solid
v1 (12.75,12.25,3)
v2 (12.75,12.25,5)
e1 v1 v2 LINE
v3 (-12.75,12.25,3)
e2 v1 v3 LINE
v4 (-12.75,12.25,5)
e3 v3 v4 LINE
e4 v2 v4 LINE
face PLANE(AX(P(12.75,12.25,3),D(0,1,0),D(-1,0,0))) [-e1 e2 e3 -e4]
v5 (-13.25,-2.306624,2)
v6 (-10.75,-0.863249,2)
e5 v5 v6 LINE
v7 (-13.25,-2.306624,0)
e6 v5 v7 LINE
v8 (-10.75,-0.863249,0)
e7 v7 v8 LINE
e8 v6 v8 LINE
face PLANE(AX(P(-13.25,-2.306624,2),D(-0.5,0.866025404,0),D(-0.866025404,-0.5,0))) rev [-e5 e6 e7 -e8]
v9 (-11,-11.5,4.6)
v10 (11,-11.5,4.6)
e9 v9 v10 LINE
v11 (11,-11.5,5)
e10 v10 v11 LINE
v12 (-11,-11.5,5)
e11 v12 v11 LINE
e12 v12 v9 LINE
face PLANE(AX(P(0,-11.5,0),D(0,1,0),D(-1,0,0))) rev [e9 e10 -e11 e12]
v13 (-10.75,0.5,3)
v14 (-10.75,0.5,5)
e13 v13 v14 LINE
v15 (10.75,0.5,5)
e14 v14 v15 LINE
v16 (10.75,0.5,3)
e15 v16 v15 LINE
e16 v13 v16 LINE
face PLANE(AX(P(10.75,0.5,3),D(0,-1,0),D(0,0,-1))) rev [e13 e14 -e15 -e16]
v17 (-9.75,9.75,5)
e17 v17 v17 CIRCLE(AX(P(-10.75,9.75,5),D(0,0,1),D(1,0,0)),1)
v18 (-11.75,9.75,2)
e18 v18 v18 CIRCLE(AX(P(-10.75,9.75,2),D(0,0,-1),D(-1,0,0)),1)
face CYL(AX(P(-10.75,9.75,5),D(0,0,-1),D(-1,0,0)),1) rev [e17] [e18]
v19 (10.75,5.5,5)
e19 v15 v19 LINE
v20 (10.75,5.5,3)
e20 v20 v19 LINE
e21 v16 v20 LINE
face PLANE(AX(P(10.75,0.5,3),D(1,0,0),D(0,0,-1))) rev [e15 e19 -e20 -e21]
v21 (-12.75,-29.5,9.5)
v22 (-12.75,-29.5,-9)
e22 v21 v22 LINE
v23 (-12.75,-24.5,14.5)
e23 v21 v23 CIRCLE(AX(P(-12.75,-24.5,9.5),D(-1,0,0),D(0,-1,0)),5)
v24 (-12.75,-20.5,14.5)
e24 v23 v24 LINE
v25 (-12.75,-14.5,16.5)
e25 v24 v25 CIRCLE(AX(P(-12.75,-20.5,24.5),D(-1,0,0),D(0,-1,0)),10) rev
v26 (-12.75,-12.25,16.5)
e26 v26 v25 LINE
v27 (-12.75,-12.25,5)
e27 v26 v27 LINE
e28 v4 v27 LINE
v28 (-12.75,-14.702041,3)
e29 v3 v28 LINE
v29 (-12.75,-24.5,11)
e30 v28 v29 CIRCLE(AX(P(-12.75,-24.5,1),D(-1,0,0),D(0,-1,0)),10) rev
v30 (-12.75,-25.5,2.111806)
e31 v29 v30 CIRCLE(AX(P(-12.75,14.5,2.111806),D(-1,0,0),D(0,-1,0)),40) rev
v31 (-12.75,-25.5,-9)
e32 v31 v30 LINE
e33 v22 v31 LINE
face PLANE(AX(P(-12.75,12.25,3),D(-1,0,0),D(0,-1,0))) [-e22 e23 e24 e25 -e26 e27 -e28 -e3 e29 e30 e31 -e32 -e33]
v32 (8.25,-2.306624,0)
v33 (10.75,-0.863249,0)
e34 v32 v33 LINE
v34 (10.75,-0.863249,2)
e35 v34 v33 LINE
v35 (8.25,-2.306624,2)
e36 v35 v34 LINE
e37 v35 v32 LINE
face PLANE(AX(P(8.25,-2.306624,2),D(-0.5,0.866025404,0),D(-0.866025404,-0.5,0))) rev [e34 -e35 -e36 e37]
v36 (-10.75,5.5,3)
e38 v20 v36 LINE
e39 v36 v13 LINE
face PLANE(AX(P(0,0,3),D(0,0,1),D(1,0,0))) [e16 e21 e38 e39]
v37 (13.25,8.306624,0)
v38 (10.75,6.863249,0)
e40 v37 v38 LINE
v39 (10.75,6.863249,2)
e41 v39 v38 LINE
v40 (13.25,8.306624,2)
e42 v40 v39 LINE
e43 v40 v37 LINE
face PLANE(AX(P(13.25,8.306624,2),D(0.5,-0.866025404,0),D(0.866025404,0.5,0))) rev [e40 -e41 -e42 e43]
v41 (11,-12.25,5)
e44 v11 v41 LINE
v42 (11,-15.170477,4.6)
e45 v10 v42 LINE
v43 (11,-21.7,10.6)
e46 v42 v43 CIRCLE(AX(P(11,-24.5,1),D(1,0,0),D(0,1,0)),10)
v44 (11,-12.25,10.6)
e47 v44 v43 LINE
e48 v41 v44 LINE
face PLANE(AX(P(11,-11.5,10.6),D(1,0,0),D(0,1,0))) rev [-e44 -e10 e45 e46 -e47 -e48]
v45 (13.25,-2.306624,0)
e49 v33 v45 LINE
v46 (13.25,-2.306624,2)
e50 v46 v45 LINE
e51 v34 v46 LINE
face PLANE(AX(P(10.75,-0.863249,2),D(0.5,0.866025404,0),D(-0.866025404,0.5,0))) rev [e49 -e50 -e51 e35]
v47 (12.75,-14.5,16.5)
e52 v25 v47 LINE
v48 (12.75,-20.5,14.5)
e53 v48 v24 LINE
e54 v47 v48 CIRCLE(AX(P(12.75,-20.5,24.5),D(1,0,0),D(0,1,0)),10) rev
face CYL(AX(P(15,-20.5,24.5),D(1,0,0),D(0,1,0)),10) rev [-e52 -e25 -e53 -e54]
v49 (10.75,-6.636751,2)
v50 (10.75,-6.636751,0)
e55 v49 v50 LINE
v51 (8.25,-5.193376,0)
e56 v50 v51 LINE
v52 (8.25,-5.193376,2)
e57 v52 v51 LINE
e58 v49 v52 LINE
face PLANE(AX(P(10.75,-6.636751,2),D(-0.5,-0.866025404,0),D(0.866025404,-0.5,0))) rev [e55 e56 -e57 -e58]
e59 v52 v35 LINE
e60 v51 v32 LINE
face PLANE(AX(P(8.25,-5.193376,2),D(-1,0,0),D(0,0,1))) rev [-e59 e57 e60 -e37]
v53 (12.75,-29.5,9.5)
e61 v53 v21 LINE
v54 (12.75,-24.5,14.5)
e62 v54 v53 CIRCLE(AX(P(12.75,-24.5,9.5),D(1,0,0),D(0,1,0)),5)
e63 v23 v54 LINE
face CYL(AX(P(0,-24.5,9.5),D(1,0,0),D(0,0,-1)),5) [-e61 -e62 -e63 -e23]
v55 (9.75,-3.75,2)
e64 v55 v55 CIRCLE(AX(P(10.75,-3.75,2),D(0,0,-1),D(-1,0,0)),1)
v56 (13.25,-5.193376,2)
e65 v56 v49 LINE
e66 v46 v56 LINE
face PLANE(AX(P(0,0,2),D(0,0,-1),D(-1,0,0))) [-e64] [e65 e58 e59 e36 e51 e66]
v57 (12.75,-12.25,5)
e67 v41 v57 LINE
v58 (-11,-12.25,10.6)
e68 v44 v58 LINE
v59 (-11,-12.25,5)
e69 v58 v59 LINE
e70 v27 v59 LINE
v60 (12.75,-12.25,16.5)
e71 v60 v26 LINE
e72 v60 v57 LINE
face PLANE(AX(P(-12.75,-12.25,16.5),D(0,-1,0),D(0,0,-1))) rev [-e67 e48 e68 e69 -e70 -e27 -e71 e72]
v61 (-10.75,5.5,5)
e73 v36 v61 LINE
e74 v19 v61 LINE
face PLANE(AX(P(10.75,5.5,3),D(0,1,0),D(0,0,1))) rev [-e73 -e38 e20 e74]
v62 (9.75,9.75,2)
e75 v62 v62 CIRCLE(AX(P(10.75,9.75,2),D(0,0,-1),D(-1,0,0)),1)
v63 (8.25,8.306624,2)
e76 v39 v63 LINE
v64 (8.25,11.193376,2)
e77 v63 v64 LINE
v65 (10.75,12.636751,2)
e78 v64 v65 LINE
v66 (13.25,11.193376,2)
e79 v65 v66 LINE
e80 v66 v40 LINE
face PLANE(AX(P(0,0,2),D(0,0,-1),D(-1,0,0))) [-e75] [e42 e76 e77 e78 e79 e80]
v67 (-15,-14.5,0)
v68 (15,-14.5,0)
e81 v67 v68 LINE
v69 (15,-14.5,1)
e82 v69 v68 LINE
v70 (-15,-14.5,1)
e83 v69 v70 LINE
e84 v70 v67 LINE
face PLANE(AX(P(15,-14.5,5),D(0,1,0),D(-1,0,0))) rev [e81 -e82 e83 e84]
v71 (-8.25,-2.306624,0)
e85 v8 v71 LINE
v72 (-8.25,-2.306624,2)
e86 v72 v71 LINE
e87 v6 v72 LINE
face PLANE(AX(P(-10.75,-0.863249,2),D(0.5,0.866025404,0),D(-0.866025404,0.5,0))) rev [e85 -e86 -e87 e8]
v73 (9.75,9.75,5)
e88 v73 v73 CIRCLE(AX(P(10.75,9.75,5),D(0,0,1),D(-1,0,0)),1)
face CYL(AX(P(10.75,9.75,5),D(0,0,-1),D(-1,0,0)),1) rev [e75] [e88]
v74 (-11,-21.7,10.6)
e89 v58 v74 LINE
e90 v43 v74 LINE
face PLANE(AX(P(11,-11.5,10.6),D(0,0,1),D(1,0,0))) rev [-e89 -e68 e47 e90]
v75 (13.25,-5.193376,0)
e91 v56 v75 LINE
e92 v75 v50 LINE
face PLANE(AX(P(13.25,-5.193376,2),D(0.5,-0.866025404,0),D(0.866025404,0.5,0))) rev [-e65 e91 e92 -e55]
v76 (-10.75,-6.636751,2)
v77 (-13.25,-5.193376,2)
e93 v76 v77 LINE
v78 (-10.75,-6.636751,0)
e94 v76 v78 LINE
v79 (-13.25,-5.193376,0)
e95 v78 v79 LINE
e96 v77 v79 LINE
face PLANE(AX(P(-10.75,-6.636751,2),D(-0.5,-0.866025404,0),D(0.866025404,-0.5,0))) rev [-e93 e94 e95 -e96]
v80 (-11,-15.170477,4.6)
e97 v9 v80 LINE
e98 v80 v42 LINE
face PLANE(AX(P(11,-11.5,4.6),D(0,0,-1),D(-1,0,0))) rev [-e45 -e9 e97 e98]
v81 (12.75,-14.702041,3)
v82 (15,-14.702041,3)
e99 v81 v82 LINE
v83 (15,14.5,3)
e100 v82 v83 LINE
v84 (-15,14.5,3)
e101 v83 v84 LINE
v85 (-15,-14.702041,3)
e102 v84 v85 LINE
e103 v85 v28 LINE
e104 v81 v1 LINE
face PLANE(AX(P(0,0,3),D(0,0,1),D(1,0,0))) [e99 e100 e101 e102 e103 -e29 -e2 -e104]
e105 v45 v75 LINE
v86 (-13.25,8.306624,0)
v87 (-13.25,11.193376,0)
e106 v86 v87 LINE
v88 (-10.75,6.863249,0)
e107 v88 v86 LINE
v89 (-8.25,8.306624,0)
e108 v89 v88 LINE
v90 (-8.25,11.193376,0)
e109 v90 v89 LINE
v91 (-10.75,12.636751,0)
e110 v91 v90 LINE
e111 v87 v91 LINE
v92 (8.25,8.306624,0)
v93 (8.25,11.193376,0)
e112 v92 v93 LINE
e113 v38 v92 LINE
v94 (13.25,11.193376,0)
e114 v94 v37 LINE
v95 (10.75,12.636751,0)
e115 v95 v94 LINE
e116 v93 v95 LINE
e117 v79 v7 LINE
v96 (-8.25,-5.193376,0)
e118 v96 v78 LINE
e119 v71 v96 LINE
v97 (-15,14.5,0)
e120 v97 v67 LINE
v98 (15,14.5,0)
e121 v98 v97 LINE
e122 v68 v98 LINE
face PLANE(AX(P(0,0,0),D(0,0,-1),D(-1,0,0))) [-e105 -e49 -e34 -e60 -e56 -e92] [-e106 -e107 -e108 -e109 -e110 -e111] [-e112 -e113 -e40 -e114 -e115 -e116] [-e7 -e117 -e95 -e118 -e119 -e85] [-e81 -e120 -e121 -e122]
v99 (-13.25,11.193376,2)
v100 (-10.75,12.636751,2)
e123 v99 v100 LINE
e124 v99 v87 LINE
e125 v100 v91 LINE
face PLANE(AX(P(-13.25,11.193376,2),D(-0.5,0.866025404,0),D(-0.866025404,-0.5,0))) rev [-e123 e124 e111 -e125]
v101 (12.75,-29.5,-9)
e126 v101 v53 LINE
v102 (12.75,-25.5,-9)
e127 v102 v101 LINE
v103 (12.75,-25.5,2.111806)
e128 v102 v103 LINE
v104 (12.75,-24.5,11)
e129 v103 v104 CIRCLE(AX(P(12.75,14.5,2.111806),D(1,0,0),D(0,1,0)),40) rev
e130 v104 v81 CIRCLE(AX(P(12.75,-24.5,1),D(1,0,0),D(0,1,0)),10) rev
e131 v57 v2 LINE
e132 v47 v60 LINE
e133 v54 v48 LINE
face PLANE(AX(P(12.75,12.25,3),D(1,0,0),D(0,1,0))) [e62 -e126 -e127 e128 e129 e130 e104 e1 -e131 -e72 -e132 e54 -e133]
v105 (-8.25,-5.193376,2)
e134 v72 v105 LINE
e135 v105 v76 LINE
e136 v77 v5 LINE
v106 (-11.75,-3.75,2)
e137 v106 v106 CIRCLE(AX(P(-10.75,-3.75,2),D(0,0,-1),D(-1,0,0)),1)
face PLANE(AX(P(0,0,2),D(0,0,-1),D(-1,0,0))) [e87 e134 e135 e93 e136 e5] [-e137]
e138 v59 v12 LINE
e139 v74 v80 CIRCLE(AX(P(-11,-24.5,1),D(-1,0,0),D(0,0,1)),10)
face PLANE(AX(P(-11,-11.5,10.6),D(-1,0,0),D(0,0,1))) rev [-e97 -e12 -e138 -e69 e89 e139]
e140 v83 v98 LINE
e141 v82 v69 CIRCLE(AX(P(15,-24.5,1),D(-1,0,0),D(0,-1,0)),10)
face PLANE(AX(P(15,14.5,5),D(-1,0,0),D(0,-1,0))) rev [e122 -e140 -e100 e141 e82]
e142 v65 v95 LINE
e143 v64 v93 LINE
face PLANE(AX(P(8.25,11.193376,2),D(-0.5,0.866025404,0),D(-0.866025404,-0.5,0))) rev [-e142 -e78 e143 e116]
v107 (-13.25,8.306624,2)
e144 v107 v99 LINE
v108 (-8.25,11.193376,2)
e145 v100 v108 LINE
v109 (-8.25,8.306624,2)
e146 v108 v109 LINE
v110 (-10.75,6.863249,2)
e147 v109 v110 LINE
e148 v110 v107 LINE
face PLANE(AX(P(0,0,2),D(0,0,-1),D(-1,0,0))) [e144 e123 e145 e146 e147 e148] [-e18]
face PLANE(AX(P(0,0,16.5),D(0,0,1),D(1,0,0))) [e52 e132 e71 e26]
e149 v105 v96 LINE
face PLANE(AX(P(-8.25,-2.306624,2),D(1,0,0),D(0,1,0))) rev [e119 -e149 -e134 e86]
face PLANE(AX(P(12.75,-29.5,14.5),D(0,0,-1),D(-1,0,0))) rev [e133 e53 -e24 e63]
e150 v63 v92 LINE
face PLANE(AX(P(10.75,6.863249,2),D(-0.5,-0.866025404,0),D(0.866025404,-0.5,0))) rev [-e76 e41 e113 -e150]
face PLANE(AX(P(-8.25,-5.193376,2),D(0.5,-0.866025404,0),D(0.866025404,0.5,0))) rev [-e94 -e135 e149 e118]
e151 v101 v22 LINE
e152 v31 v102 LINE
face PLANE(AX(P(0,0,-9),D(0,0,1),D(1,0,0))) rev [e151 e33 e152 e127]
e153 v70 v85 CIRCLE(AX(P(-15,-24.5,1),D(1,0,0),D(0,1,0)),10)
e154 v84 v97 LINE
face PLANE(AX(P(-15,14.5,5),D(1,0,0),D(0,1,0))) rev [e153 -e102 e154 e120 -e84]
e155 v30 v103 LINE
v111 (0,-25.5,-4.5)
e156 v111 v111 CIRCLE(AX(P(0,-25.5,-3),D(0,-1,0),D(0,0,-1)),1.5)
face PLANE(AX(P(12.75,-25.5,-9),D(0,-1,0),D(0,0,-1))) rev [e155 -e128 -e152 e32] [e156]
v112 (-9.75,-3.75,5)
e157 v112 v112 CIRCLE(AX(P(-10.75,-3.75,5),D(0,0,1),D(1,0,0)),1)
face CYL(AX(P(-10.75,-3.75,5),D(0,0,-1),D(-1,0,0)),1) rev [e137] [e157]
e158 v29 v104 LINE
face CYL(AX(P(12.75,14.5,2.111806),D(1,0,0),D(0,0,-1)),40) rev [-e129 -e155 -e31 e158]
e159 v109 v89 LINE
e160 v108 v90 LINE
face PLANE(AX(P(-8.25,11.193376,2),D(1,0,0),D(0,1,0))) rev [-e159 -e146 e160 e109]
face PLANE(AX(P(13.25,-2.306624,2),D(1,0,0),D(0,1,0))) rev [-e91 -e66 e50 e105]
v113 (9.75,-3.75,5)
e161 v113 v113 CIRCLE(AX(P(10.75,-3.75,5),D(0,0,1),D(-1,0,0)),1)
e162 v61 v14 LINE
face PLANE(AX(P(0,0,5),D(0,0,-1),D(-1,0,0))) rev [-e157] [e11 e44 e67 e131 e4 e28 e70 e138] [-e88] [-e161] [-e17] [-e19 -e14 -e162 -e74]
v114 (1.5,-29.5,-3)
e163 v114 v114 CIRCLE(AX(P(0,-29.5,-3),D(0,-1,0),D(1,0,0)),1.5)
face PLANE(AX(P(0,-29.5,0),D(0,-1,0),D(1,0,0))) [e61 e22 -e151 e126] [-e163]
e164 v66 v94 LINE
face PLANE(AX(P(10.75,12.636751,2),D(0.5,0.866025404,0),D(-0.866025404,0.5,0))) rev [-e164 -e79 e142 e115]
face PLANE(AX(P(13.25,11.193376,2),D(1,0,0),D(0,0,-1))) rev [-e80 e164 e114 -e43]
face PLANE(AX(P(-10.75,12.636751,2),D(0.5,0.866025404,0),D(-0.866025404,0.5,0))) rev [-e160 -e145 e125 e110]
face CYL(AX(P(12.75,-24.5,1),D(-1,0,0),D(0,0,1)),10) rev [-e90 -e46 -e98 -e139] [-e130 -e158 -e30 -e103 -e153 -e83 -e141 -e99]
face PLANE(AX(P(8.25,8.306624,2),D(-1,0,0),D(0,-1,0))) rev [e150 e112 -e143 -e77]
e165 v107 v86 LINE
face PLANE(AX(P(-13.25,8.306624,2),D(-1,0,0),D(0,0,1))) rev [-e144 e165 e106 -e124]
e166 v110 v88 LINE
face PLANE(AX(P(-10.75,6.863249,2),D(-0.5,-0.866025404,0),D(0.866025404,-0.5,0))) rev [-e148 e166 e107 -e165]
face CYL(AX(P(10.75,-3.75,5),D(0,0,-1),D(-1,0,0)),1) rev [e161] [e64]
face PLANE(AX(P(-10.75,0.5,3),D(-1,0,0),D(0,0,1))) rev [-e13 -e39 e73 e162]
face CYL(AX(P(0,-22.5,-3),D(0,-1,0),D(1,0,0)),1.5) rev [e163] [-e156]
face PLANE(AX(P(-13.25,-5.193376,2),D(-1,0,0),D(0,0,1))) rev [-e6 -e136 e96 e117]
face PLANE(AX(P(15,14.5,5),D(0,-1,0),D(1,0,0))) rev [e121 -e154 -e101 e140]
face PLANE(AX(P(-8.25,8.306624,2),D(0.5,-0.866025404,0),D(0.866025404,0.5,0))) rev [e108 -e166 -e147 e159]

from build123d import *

# Parameters (mm, degrees)
CROQUIS3_W              = 30
CROQUIS3_H              = 29
SALIENTE_EXTRUIR1_DEPTH = 5
CROQUIS5_W              = 30
CROQUIS5_H              = 29
CROQUIS5_W_2            = 25.5
CROQUIS5_H_2            = 24.5
CORTAR_EXTRUIR1_DEPTH   = 2
CROQUIS9_W              = 25.5
CROQUIS9_H              = 2.25
SALIENTE_EXTRUIR2_DEPTH = 13.5
CROQUIS11_W             = 22
CROQUIS11_H             = 6
CORTAR_EXTRUIR3_DEPTH   = 3
CROQUIS12_W             = 25.5
CROQUIS12_H             = 3.5
SALIENTE_EXTRUIR3_DEPTH = 15
CROQUIS13_W             = 25.5
CROQUIS13_H             = 4
SALIENTE_EXTRUIR4_DEPTH = 20
REDONDEO3_R             = 5
CROQUIS14_R             = 1.5
CORTAR_EXTRUIR4_DEPTH   = 7
REDONDEO5_R             = 10
REDONDEO6_R             = 40
CROQUIS6_R              = 1
CORTAR_EXTRUIR5_DEPTH   = 5
CORTAR_EXTRUIR7_DEPTH   = 2
CROQUIS16_W             = 21.5
CROQUIS16_H             = 5
CORTAR_EXTRUIR8_DEPTH   = 2


with BuildPart() as part:
    # Croquis3 → Saliente-Extruir1 (new body)
    with BuildSketch(Plane.XY):
        Rectangle(CROQUIS3_W, CROQUIS3_H)
    extrude(amount=SALIENTE_EXTRUIR1_DEPTH)

    # Croquis5 → Cortar-Extruir1 (cut)
    with BuildSketch(Plane.XY.offset(5)):
        Rectangle(CROQUIS5_W, CROQUIS5_H)
        Rectangle(CROQUIS5_W_2, CROQUIS5_H_2, mode=Mode.SUBTRACT)
    extrude(amount=-CORTAR_EXTRUIR1_DEPTH, mode=Mode.SUBTRACT)

    # Croquis9 → Saliente-Extruir2 (add)
    with BuildSketch(Plane.XY.offset(3)):
        with Locations((0, -13.375)):
            Rectangle(CROQUIS9_W, CROQUIS9_H)
    extrude(amount=SALIENTE_EXTRUIR2_DEPTH)

    # Croquis11 → Cortar-Extruir3 (cut)
    with BuildSketch(Plane.XZ.offset(14.5)):
        with Locations((0, 7.6)):
            Rectangle(CROQUIS11_W, CROQUIS11_H)
    extrude(amount=-CORTAR_EXTRUIR3_DEPTH, mode=Mode.SUBTRACT)

    # Croquis12 → Saliente-Extruir3 (add)
    with BuildSketch(Plane.XZ.offset(14.5)):
        with Locations((0, 12.75)):
            Rectangle(CROQUIS12_W, CROQUIS12_H)
    extrude(amount=SALIENTE_EXTRUIR3_DEPTH)

    # Croquis13 → Saliente-Extruir4 (add)
    with BuildSketch(Plane(origin=(0, 0, 11), x_dir=(-1, 0, 0), z_dir=(0, 0, -1))):
        with Locations((0, -27.5)):
            Rectangle(CROQUIS13_W, CROQUIS13_H)
    extrude(amount=SALIENTE_EXTRUIR4_DEPTH)

    # Redondeo3
    redondeo3_edges = [part.edges().sort_by_distance(p)[0] for p in [
        (0, -29.5, 14.5),
    ]]
    fillet(redondeo3_edges, radius=REDONDEO3_R)

    # Croquis14 → Cortar-Extruir4 (cut)
    with BuildSketch(Plane.XZ.offset(29.5)):
        with Locations((0, -3)):
            Circle(CROQUIS14_R)
    extrude(amount=-CORTAR_EXTRUIR4_DEPTH, mode=Mode.SUBTRACT)

    # Redondeo5
    # the kernel refuses this fillet: 10 mm, written as the material it adds along each edge
    with BuildSketch(Plane(origin=(12.75, -14.5, 11), x_dir=(0, -1, 0), z_dir=(-1, 0, 0))) as redondeo5_piece_1_section:
        with BuildLine():
            CenterArc((REDONDEO5_R, -REDONDEO5_R), REDONDEO5_R, 90, 90)
            Line((0, -REDONDEO5_R), (0, 0))
            Line((0, 0), (REDONDEO5_R, 0))
        make_face()
    redondeo5_piece_1 = extrude(amount=50.5, mode=Mode.PRIVATE)
    redondeo5_piece_1 = split(redondeo5_piece_1, bisect_by=Plane(origin=(11, -14.5, 11), z_dir=(1, 0, 0)), keep=Keep.TOP, mode=Mode.PRIVATE)
    add(redondeo5_piece_1)
    with BuildSketch(Plane(origin=(37.75, -14.5, 11), x_dir=(0, -1, 0), z_dir=(-1, 0, 0))) as redondeo5_piece_2_section:
        with BuildLine():
            CenterArc((REDONDEO5_R, -REDONDEO5_R), REDONDEO5_R, 90, 90)
            Line((0, -REDONDEO5_R), (0, 0))
            Line((0, 0), (REDONDEO5_R, 0))
        make_face()
    redondeo5_piece_2 = extrude(amount=50.5, mode=Mode.PRIVATE)
    redondeo5_piece_2 = split(redondeo5_piece_2, bisect_by=Plane(origin=(11, -14.5, 11), z_dir=(-1, 0, 0)), keep=Keep.TOP, mode=Mode.PRIVATE)
    redondeo5_piece_2 = split(redondeo5_piece_2, bisect_by=Plane(origin=(37.75, -14.5, 10.6), z_dir=(0, 0, 1)), keep=Keep.TOP, mode=Mode.PRIVATE)
    add(redondeo5_piece_2)
    with BuildSketch(Plane(origin=(37.75, -14.5, 11), x_dir=(0, -1, 0), z_dir=(-1, 0, 0))) as redondeo5_piece_3_section:
        with BuildLine():
            CenterArc((REDONDEO5_R, -REDONDEO5_R), REDONDEO5_R, 90, 90)
            Line((0, -REDONDEO5_R), (0, 0))
            Line((0, 0), (REDONDEO5_R, 0))
        make_face()
    redondeo5_piece_3 = extrude(amount=75.5, mode=Mode.PRIVATE)
    redondeo5_piece_3 = split(redondeo5_piece_3, bisect_by=Plane(origin=(37.75, -14.5, 3), z_dir=(0, 0, -1)), keep=Keep.TOP, mode=Mode.PRIVATE)
    redondeo5_piece_3 = split(redondeo5_piece_3, bisect_by=Plane(origin=(15, -14.5, 11), z_dir=(-1, 0, 0)), keep=Keep.TOP, mode=Mode.PRIVATE)
    redondeo5_piece_3 = split(redondeo5_piece_3, bisect_by=Plane(origin=(-15, -14.5, 11), z_dir=(1, 0, 0)), keep=Keep.TOP, mode=Mode.PRIVATE)
    add(redondeo5_piece_3)
    with BuildSketch(Plane(origin=(37.75, -14.5, 11), x_dir=(0, -1, 0), z_dir=(-1, 0, 0))) as redondeo5_piece_4_section:
        with BuildLine():
            CenterArc((REDONDEO5_R, -REDONDEO5_R), REDONDEO5_R, 90, 90)
            Line((0, -REDONDEO5_R), (0, 0))
            Line((0, 0), (REDONDEO5_R, 0))
        make_face()
    redondeo5_piece_4 = extrude(amount=50.5, mode=Mode.PRIVATE)
    redondeo5_piece_4 = split(redondeo5_piece_4, bisect_by=Plane(origin=(11, -14.5, 11), z_dir=(-1, 0, 0)), keep=Keep.TOP, mode=Mode.PRIVATE)
    redondeo5_piece_4 = split(redondeo5_piece_4, bisect_by=Plane(origin=(37.75, -14.5, 4.6), z_dir=(0, 0, -1)), keep=Keep.TOP, mode=Mode.PRIVATE)
    add(redondeo5_piece_4)
    with BuildSketch(Plane(origin=(37.75, -14.5, 11), x_dir=(0, -1, 0), z_dir=(-1, 0, 0))) as redondeo5_piece_5_section:
        with BuildLine():
            CenterArc((REDONDEO5_R, -REDONDEO5_R), REDONDEO5_R, 90, 90)
            Line((0, -REDONDEO5_R), (0, 0))
            Line((0, 0), (REDONDEO5_R, 0))
        make_face()
    redondeo5_piece_5 = extrude(amount=50.5, mode=Mode.PRIVATE)
    redondeo5_piece_5 = split(redondeo5_piece_5, bisect_by=Plane(origin=(-11, -14.5, 11), z_dir=(-1, 0, 0)), keep=Keep.TOP, mode=Mode.PRIVATE)
    add(redondeo5_piece_5)
    with BuildSketch(Plane(origin=(-12.75, -14.5, 14.5), x_dir=(0, -1, 0), z_dir=(1, 0, 0))) as redondeo5_piece_6:
        with BuildLine():
            CenterArc((6, -10), REDONDEO5_R, 90, 36.869897646)
            Line((0, -2), (0, 0))
            Line((0, 0), (6, 0))
        make_face()
    extrude(amount=25.5)

    # Redondeo6
    # the kernel refuses this fillet: 40 mm, written as the material it adds along each edge
    with BuildSketch(Plane(origin=(-12.75, -25.5, 11), x_dir=(0, 1, 0), z_dir=(1, 0, 0))) as redondeo6_piece_1:
        with BuildLine():
            CenterArc((40, -8.888194417), REDONDEO6_R, 167.161431859, 12.838568141)
            Line((0, -8.888194417), (-0.8, -8.888194417))
            Line((-0.8, -8.888194417), (-0.8, 0))
            Line((-0.8, 0), (0, 0.8))
            ThreePointArc((0, 0.8), (0.5, 0.8), (0.22, 0.177763888))
            Line((0.22, 0.177763888), (1, 0))
        make_face()
    extrude(amount=25.5)

    # Croquis6 → Cortar-Extruir5 (cut)
    with BuildSketch(Plane.XY):
        with Locations((-10.75, 9.75)):
            Circle(CROQUIS6_R)
        with Locations((-10.75, -3.75)):
            Circle(CROQUIS6_R)
        with Locations(Location((10.75, -3.75, 0), (0, 0, 180))):
            Circle(CROQUIS6_R)
        with Locations(Location((10.75, 9.75, 0), (0, 0, 180))):
            Circle(CROQUIS6_R)
    extrude(amount=CORTAR_EXTRUIR5_DEPTH, mode=Mode.SUBTRACT)

    # Croquis15 → Cortar-Extruir7 (cut)
    with BuildSketch(Plane(origin=(0, 0, 0), x_dir=(-1, 0, 0), z_dir=(0, 0, -1))):
        Polygon((-10.75, 12.636751346), (-13.25, 11.193375673), (-13.25, 8.306624327), (-10.75, 6.863248654), (-8.25, 8.306624327), (-8.25, 11.193375673), align=None)
        Polygon((10.75, 12.636751346), (8.25, 11.193375673), (8.25, 8.306624327), (10.75, 6.863248654), (13.25, 8.306624327), (13.25, 11.193375673), align=None)
        Polygon((10.75, -0.863248654), (8.25, -2.306624327), (8.25, -5.193375673), (10.75, -6.636751346), (13.25, -5.193375673), (13.25, -2.306624327), align=None)
        Polygon((-10.75, -0.863248654), (-13.25, -2.306624327), (-13.25, -5.193375673), (-10.75, -6.636751346), (-8.25, -5.193375673), (-8.25, -2.306624327), align=None)
    extrude(amount=-CORTAR_EXTRUIR7_DEPTH, mode=Mode.SUBTRACT)

    # Croquis16 → Cortar-Extruir8 (cut)
    with BuildSketch(Plane.XY.offset(5)):
        with Locations((0, 3)):
            Rectangle(CROQUIS16_W, CROQUIS16_H)
    extrude(amount=-CORTAR_EXTRUIR8_DEPTH, mode=Mode.SUBTRACT)


solid = part.part
